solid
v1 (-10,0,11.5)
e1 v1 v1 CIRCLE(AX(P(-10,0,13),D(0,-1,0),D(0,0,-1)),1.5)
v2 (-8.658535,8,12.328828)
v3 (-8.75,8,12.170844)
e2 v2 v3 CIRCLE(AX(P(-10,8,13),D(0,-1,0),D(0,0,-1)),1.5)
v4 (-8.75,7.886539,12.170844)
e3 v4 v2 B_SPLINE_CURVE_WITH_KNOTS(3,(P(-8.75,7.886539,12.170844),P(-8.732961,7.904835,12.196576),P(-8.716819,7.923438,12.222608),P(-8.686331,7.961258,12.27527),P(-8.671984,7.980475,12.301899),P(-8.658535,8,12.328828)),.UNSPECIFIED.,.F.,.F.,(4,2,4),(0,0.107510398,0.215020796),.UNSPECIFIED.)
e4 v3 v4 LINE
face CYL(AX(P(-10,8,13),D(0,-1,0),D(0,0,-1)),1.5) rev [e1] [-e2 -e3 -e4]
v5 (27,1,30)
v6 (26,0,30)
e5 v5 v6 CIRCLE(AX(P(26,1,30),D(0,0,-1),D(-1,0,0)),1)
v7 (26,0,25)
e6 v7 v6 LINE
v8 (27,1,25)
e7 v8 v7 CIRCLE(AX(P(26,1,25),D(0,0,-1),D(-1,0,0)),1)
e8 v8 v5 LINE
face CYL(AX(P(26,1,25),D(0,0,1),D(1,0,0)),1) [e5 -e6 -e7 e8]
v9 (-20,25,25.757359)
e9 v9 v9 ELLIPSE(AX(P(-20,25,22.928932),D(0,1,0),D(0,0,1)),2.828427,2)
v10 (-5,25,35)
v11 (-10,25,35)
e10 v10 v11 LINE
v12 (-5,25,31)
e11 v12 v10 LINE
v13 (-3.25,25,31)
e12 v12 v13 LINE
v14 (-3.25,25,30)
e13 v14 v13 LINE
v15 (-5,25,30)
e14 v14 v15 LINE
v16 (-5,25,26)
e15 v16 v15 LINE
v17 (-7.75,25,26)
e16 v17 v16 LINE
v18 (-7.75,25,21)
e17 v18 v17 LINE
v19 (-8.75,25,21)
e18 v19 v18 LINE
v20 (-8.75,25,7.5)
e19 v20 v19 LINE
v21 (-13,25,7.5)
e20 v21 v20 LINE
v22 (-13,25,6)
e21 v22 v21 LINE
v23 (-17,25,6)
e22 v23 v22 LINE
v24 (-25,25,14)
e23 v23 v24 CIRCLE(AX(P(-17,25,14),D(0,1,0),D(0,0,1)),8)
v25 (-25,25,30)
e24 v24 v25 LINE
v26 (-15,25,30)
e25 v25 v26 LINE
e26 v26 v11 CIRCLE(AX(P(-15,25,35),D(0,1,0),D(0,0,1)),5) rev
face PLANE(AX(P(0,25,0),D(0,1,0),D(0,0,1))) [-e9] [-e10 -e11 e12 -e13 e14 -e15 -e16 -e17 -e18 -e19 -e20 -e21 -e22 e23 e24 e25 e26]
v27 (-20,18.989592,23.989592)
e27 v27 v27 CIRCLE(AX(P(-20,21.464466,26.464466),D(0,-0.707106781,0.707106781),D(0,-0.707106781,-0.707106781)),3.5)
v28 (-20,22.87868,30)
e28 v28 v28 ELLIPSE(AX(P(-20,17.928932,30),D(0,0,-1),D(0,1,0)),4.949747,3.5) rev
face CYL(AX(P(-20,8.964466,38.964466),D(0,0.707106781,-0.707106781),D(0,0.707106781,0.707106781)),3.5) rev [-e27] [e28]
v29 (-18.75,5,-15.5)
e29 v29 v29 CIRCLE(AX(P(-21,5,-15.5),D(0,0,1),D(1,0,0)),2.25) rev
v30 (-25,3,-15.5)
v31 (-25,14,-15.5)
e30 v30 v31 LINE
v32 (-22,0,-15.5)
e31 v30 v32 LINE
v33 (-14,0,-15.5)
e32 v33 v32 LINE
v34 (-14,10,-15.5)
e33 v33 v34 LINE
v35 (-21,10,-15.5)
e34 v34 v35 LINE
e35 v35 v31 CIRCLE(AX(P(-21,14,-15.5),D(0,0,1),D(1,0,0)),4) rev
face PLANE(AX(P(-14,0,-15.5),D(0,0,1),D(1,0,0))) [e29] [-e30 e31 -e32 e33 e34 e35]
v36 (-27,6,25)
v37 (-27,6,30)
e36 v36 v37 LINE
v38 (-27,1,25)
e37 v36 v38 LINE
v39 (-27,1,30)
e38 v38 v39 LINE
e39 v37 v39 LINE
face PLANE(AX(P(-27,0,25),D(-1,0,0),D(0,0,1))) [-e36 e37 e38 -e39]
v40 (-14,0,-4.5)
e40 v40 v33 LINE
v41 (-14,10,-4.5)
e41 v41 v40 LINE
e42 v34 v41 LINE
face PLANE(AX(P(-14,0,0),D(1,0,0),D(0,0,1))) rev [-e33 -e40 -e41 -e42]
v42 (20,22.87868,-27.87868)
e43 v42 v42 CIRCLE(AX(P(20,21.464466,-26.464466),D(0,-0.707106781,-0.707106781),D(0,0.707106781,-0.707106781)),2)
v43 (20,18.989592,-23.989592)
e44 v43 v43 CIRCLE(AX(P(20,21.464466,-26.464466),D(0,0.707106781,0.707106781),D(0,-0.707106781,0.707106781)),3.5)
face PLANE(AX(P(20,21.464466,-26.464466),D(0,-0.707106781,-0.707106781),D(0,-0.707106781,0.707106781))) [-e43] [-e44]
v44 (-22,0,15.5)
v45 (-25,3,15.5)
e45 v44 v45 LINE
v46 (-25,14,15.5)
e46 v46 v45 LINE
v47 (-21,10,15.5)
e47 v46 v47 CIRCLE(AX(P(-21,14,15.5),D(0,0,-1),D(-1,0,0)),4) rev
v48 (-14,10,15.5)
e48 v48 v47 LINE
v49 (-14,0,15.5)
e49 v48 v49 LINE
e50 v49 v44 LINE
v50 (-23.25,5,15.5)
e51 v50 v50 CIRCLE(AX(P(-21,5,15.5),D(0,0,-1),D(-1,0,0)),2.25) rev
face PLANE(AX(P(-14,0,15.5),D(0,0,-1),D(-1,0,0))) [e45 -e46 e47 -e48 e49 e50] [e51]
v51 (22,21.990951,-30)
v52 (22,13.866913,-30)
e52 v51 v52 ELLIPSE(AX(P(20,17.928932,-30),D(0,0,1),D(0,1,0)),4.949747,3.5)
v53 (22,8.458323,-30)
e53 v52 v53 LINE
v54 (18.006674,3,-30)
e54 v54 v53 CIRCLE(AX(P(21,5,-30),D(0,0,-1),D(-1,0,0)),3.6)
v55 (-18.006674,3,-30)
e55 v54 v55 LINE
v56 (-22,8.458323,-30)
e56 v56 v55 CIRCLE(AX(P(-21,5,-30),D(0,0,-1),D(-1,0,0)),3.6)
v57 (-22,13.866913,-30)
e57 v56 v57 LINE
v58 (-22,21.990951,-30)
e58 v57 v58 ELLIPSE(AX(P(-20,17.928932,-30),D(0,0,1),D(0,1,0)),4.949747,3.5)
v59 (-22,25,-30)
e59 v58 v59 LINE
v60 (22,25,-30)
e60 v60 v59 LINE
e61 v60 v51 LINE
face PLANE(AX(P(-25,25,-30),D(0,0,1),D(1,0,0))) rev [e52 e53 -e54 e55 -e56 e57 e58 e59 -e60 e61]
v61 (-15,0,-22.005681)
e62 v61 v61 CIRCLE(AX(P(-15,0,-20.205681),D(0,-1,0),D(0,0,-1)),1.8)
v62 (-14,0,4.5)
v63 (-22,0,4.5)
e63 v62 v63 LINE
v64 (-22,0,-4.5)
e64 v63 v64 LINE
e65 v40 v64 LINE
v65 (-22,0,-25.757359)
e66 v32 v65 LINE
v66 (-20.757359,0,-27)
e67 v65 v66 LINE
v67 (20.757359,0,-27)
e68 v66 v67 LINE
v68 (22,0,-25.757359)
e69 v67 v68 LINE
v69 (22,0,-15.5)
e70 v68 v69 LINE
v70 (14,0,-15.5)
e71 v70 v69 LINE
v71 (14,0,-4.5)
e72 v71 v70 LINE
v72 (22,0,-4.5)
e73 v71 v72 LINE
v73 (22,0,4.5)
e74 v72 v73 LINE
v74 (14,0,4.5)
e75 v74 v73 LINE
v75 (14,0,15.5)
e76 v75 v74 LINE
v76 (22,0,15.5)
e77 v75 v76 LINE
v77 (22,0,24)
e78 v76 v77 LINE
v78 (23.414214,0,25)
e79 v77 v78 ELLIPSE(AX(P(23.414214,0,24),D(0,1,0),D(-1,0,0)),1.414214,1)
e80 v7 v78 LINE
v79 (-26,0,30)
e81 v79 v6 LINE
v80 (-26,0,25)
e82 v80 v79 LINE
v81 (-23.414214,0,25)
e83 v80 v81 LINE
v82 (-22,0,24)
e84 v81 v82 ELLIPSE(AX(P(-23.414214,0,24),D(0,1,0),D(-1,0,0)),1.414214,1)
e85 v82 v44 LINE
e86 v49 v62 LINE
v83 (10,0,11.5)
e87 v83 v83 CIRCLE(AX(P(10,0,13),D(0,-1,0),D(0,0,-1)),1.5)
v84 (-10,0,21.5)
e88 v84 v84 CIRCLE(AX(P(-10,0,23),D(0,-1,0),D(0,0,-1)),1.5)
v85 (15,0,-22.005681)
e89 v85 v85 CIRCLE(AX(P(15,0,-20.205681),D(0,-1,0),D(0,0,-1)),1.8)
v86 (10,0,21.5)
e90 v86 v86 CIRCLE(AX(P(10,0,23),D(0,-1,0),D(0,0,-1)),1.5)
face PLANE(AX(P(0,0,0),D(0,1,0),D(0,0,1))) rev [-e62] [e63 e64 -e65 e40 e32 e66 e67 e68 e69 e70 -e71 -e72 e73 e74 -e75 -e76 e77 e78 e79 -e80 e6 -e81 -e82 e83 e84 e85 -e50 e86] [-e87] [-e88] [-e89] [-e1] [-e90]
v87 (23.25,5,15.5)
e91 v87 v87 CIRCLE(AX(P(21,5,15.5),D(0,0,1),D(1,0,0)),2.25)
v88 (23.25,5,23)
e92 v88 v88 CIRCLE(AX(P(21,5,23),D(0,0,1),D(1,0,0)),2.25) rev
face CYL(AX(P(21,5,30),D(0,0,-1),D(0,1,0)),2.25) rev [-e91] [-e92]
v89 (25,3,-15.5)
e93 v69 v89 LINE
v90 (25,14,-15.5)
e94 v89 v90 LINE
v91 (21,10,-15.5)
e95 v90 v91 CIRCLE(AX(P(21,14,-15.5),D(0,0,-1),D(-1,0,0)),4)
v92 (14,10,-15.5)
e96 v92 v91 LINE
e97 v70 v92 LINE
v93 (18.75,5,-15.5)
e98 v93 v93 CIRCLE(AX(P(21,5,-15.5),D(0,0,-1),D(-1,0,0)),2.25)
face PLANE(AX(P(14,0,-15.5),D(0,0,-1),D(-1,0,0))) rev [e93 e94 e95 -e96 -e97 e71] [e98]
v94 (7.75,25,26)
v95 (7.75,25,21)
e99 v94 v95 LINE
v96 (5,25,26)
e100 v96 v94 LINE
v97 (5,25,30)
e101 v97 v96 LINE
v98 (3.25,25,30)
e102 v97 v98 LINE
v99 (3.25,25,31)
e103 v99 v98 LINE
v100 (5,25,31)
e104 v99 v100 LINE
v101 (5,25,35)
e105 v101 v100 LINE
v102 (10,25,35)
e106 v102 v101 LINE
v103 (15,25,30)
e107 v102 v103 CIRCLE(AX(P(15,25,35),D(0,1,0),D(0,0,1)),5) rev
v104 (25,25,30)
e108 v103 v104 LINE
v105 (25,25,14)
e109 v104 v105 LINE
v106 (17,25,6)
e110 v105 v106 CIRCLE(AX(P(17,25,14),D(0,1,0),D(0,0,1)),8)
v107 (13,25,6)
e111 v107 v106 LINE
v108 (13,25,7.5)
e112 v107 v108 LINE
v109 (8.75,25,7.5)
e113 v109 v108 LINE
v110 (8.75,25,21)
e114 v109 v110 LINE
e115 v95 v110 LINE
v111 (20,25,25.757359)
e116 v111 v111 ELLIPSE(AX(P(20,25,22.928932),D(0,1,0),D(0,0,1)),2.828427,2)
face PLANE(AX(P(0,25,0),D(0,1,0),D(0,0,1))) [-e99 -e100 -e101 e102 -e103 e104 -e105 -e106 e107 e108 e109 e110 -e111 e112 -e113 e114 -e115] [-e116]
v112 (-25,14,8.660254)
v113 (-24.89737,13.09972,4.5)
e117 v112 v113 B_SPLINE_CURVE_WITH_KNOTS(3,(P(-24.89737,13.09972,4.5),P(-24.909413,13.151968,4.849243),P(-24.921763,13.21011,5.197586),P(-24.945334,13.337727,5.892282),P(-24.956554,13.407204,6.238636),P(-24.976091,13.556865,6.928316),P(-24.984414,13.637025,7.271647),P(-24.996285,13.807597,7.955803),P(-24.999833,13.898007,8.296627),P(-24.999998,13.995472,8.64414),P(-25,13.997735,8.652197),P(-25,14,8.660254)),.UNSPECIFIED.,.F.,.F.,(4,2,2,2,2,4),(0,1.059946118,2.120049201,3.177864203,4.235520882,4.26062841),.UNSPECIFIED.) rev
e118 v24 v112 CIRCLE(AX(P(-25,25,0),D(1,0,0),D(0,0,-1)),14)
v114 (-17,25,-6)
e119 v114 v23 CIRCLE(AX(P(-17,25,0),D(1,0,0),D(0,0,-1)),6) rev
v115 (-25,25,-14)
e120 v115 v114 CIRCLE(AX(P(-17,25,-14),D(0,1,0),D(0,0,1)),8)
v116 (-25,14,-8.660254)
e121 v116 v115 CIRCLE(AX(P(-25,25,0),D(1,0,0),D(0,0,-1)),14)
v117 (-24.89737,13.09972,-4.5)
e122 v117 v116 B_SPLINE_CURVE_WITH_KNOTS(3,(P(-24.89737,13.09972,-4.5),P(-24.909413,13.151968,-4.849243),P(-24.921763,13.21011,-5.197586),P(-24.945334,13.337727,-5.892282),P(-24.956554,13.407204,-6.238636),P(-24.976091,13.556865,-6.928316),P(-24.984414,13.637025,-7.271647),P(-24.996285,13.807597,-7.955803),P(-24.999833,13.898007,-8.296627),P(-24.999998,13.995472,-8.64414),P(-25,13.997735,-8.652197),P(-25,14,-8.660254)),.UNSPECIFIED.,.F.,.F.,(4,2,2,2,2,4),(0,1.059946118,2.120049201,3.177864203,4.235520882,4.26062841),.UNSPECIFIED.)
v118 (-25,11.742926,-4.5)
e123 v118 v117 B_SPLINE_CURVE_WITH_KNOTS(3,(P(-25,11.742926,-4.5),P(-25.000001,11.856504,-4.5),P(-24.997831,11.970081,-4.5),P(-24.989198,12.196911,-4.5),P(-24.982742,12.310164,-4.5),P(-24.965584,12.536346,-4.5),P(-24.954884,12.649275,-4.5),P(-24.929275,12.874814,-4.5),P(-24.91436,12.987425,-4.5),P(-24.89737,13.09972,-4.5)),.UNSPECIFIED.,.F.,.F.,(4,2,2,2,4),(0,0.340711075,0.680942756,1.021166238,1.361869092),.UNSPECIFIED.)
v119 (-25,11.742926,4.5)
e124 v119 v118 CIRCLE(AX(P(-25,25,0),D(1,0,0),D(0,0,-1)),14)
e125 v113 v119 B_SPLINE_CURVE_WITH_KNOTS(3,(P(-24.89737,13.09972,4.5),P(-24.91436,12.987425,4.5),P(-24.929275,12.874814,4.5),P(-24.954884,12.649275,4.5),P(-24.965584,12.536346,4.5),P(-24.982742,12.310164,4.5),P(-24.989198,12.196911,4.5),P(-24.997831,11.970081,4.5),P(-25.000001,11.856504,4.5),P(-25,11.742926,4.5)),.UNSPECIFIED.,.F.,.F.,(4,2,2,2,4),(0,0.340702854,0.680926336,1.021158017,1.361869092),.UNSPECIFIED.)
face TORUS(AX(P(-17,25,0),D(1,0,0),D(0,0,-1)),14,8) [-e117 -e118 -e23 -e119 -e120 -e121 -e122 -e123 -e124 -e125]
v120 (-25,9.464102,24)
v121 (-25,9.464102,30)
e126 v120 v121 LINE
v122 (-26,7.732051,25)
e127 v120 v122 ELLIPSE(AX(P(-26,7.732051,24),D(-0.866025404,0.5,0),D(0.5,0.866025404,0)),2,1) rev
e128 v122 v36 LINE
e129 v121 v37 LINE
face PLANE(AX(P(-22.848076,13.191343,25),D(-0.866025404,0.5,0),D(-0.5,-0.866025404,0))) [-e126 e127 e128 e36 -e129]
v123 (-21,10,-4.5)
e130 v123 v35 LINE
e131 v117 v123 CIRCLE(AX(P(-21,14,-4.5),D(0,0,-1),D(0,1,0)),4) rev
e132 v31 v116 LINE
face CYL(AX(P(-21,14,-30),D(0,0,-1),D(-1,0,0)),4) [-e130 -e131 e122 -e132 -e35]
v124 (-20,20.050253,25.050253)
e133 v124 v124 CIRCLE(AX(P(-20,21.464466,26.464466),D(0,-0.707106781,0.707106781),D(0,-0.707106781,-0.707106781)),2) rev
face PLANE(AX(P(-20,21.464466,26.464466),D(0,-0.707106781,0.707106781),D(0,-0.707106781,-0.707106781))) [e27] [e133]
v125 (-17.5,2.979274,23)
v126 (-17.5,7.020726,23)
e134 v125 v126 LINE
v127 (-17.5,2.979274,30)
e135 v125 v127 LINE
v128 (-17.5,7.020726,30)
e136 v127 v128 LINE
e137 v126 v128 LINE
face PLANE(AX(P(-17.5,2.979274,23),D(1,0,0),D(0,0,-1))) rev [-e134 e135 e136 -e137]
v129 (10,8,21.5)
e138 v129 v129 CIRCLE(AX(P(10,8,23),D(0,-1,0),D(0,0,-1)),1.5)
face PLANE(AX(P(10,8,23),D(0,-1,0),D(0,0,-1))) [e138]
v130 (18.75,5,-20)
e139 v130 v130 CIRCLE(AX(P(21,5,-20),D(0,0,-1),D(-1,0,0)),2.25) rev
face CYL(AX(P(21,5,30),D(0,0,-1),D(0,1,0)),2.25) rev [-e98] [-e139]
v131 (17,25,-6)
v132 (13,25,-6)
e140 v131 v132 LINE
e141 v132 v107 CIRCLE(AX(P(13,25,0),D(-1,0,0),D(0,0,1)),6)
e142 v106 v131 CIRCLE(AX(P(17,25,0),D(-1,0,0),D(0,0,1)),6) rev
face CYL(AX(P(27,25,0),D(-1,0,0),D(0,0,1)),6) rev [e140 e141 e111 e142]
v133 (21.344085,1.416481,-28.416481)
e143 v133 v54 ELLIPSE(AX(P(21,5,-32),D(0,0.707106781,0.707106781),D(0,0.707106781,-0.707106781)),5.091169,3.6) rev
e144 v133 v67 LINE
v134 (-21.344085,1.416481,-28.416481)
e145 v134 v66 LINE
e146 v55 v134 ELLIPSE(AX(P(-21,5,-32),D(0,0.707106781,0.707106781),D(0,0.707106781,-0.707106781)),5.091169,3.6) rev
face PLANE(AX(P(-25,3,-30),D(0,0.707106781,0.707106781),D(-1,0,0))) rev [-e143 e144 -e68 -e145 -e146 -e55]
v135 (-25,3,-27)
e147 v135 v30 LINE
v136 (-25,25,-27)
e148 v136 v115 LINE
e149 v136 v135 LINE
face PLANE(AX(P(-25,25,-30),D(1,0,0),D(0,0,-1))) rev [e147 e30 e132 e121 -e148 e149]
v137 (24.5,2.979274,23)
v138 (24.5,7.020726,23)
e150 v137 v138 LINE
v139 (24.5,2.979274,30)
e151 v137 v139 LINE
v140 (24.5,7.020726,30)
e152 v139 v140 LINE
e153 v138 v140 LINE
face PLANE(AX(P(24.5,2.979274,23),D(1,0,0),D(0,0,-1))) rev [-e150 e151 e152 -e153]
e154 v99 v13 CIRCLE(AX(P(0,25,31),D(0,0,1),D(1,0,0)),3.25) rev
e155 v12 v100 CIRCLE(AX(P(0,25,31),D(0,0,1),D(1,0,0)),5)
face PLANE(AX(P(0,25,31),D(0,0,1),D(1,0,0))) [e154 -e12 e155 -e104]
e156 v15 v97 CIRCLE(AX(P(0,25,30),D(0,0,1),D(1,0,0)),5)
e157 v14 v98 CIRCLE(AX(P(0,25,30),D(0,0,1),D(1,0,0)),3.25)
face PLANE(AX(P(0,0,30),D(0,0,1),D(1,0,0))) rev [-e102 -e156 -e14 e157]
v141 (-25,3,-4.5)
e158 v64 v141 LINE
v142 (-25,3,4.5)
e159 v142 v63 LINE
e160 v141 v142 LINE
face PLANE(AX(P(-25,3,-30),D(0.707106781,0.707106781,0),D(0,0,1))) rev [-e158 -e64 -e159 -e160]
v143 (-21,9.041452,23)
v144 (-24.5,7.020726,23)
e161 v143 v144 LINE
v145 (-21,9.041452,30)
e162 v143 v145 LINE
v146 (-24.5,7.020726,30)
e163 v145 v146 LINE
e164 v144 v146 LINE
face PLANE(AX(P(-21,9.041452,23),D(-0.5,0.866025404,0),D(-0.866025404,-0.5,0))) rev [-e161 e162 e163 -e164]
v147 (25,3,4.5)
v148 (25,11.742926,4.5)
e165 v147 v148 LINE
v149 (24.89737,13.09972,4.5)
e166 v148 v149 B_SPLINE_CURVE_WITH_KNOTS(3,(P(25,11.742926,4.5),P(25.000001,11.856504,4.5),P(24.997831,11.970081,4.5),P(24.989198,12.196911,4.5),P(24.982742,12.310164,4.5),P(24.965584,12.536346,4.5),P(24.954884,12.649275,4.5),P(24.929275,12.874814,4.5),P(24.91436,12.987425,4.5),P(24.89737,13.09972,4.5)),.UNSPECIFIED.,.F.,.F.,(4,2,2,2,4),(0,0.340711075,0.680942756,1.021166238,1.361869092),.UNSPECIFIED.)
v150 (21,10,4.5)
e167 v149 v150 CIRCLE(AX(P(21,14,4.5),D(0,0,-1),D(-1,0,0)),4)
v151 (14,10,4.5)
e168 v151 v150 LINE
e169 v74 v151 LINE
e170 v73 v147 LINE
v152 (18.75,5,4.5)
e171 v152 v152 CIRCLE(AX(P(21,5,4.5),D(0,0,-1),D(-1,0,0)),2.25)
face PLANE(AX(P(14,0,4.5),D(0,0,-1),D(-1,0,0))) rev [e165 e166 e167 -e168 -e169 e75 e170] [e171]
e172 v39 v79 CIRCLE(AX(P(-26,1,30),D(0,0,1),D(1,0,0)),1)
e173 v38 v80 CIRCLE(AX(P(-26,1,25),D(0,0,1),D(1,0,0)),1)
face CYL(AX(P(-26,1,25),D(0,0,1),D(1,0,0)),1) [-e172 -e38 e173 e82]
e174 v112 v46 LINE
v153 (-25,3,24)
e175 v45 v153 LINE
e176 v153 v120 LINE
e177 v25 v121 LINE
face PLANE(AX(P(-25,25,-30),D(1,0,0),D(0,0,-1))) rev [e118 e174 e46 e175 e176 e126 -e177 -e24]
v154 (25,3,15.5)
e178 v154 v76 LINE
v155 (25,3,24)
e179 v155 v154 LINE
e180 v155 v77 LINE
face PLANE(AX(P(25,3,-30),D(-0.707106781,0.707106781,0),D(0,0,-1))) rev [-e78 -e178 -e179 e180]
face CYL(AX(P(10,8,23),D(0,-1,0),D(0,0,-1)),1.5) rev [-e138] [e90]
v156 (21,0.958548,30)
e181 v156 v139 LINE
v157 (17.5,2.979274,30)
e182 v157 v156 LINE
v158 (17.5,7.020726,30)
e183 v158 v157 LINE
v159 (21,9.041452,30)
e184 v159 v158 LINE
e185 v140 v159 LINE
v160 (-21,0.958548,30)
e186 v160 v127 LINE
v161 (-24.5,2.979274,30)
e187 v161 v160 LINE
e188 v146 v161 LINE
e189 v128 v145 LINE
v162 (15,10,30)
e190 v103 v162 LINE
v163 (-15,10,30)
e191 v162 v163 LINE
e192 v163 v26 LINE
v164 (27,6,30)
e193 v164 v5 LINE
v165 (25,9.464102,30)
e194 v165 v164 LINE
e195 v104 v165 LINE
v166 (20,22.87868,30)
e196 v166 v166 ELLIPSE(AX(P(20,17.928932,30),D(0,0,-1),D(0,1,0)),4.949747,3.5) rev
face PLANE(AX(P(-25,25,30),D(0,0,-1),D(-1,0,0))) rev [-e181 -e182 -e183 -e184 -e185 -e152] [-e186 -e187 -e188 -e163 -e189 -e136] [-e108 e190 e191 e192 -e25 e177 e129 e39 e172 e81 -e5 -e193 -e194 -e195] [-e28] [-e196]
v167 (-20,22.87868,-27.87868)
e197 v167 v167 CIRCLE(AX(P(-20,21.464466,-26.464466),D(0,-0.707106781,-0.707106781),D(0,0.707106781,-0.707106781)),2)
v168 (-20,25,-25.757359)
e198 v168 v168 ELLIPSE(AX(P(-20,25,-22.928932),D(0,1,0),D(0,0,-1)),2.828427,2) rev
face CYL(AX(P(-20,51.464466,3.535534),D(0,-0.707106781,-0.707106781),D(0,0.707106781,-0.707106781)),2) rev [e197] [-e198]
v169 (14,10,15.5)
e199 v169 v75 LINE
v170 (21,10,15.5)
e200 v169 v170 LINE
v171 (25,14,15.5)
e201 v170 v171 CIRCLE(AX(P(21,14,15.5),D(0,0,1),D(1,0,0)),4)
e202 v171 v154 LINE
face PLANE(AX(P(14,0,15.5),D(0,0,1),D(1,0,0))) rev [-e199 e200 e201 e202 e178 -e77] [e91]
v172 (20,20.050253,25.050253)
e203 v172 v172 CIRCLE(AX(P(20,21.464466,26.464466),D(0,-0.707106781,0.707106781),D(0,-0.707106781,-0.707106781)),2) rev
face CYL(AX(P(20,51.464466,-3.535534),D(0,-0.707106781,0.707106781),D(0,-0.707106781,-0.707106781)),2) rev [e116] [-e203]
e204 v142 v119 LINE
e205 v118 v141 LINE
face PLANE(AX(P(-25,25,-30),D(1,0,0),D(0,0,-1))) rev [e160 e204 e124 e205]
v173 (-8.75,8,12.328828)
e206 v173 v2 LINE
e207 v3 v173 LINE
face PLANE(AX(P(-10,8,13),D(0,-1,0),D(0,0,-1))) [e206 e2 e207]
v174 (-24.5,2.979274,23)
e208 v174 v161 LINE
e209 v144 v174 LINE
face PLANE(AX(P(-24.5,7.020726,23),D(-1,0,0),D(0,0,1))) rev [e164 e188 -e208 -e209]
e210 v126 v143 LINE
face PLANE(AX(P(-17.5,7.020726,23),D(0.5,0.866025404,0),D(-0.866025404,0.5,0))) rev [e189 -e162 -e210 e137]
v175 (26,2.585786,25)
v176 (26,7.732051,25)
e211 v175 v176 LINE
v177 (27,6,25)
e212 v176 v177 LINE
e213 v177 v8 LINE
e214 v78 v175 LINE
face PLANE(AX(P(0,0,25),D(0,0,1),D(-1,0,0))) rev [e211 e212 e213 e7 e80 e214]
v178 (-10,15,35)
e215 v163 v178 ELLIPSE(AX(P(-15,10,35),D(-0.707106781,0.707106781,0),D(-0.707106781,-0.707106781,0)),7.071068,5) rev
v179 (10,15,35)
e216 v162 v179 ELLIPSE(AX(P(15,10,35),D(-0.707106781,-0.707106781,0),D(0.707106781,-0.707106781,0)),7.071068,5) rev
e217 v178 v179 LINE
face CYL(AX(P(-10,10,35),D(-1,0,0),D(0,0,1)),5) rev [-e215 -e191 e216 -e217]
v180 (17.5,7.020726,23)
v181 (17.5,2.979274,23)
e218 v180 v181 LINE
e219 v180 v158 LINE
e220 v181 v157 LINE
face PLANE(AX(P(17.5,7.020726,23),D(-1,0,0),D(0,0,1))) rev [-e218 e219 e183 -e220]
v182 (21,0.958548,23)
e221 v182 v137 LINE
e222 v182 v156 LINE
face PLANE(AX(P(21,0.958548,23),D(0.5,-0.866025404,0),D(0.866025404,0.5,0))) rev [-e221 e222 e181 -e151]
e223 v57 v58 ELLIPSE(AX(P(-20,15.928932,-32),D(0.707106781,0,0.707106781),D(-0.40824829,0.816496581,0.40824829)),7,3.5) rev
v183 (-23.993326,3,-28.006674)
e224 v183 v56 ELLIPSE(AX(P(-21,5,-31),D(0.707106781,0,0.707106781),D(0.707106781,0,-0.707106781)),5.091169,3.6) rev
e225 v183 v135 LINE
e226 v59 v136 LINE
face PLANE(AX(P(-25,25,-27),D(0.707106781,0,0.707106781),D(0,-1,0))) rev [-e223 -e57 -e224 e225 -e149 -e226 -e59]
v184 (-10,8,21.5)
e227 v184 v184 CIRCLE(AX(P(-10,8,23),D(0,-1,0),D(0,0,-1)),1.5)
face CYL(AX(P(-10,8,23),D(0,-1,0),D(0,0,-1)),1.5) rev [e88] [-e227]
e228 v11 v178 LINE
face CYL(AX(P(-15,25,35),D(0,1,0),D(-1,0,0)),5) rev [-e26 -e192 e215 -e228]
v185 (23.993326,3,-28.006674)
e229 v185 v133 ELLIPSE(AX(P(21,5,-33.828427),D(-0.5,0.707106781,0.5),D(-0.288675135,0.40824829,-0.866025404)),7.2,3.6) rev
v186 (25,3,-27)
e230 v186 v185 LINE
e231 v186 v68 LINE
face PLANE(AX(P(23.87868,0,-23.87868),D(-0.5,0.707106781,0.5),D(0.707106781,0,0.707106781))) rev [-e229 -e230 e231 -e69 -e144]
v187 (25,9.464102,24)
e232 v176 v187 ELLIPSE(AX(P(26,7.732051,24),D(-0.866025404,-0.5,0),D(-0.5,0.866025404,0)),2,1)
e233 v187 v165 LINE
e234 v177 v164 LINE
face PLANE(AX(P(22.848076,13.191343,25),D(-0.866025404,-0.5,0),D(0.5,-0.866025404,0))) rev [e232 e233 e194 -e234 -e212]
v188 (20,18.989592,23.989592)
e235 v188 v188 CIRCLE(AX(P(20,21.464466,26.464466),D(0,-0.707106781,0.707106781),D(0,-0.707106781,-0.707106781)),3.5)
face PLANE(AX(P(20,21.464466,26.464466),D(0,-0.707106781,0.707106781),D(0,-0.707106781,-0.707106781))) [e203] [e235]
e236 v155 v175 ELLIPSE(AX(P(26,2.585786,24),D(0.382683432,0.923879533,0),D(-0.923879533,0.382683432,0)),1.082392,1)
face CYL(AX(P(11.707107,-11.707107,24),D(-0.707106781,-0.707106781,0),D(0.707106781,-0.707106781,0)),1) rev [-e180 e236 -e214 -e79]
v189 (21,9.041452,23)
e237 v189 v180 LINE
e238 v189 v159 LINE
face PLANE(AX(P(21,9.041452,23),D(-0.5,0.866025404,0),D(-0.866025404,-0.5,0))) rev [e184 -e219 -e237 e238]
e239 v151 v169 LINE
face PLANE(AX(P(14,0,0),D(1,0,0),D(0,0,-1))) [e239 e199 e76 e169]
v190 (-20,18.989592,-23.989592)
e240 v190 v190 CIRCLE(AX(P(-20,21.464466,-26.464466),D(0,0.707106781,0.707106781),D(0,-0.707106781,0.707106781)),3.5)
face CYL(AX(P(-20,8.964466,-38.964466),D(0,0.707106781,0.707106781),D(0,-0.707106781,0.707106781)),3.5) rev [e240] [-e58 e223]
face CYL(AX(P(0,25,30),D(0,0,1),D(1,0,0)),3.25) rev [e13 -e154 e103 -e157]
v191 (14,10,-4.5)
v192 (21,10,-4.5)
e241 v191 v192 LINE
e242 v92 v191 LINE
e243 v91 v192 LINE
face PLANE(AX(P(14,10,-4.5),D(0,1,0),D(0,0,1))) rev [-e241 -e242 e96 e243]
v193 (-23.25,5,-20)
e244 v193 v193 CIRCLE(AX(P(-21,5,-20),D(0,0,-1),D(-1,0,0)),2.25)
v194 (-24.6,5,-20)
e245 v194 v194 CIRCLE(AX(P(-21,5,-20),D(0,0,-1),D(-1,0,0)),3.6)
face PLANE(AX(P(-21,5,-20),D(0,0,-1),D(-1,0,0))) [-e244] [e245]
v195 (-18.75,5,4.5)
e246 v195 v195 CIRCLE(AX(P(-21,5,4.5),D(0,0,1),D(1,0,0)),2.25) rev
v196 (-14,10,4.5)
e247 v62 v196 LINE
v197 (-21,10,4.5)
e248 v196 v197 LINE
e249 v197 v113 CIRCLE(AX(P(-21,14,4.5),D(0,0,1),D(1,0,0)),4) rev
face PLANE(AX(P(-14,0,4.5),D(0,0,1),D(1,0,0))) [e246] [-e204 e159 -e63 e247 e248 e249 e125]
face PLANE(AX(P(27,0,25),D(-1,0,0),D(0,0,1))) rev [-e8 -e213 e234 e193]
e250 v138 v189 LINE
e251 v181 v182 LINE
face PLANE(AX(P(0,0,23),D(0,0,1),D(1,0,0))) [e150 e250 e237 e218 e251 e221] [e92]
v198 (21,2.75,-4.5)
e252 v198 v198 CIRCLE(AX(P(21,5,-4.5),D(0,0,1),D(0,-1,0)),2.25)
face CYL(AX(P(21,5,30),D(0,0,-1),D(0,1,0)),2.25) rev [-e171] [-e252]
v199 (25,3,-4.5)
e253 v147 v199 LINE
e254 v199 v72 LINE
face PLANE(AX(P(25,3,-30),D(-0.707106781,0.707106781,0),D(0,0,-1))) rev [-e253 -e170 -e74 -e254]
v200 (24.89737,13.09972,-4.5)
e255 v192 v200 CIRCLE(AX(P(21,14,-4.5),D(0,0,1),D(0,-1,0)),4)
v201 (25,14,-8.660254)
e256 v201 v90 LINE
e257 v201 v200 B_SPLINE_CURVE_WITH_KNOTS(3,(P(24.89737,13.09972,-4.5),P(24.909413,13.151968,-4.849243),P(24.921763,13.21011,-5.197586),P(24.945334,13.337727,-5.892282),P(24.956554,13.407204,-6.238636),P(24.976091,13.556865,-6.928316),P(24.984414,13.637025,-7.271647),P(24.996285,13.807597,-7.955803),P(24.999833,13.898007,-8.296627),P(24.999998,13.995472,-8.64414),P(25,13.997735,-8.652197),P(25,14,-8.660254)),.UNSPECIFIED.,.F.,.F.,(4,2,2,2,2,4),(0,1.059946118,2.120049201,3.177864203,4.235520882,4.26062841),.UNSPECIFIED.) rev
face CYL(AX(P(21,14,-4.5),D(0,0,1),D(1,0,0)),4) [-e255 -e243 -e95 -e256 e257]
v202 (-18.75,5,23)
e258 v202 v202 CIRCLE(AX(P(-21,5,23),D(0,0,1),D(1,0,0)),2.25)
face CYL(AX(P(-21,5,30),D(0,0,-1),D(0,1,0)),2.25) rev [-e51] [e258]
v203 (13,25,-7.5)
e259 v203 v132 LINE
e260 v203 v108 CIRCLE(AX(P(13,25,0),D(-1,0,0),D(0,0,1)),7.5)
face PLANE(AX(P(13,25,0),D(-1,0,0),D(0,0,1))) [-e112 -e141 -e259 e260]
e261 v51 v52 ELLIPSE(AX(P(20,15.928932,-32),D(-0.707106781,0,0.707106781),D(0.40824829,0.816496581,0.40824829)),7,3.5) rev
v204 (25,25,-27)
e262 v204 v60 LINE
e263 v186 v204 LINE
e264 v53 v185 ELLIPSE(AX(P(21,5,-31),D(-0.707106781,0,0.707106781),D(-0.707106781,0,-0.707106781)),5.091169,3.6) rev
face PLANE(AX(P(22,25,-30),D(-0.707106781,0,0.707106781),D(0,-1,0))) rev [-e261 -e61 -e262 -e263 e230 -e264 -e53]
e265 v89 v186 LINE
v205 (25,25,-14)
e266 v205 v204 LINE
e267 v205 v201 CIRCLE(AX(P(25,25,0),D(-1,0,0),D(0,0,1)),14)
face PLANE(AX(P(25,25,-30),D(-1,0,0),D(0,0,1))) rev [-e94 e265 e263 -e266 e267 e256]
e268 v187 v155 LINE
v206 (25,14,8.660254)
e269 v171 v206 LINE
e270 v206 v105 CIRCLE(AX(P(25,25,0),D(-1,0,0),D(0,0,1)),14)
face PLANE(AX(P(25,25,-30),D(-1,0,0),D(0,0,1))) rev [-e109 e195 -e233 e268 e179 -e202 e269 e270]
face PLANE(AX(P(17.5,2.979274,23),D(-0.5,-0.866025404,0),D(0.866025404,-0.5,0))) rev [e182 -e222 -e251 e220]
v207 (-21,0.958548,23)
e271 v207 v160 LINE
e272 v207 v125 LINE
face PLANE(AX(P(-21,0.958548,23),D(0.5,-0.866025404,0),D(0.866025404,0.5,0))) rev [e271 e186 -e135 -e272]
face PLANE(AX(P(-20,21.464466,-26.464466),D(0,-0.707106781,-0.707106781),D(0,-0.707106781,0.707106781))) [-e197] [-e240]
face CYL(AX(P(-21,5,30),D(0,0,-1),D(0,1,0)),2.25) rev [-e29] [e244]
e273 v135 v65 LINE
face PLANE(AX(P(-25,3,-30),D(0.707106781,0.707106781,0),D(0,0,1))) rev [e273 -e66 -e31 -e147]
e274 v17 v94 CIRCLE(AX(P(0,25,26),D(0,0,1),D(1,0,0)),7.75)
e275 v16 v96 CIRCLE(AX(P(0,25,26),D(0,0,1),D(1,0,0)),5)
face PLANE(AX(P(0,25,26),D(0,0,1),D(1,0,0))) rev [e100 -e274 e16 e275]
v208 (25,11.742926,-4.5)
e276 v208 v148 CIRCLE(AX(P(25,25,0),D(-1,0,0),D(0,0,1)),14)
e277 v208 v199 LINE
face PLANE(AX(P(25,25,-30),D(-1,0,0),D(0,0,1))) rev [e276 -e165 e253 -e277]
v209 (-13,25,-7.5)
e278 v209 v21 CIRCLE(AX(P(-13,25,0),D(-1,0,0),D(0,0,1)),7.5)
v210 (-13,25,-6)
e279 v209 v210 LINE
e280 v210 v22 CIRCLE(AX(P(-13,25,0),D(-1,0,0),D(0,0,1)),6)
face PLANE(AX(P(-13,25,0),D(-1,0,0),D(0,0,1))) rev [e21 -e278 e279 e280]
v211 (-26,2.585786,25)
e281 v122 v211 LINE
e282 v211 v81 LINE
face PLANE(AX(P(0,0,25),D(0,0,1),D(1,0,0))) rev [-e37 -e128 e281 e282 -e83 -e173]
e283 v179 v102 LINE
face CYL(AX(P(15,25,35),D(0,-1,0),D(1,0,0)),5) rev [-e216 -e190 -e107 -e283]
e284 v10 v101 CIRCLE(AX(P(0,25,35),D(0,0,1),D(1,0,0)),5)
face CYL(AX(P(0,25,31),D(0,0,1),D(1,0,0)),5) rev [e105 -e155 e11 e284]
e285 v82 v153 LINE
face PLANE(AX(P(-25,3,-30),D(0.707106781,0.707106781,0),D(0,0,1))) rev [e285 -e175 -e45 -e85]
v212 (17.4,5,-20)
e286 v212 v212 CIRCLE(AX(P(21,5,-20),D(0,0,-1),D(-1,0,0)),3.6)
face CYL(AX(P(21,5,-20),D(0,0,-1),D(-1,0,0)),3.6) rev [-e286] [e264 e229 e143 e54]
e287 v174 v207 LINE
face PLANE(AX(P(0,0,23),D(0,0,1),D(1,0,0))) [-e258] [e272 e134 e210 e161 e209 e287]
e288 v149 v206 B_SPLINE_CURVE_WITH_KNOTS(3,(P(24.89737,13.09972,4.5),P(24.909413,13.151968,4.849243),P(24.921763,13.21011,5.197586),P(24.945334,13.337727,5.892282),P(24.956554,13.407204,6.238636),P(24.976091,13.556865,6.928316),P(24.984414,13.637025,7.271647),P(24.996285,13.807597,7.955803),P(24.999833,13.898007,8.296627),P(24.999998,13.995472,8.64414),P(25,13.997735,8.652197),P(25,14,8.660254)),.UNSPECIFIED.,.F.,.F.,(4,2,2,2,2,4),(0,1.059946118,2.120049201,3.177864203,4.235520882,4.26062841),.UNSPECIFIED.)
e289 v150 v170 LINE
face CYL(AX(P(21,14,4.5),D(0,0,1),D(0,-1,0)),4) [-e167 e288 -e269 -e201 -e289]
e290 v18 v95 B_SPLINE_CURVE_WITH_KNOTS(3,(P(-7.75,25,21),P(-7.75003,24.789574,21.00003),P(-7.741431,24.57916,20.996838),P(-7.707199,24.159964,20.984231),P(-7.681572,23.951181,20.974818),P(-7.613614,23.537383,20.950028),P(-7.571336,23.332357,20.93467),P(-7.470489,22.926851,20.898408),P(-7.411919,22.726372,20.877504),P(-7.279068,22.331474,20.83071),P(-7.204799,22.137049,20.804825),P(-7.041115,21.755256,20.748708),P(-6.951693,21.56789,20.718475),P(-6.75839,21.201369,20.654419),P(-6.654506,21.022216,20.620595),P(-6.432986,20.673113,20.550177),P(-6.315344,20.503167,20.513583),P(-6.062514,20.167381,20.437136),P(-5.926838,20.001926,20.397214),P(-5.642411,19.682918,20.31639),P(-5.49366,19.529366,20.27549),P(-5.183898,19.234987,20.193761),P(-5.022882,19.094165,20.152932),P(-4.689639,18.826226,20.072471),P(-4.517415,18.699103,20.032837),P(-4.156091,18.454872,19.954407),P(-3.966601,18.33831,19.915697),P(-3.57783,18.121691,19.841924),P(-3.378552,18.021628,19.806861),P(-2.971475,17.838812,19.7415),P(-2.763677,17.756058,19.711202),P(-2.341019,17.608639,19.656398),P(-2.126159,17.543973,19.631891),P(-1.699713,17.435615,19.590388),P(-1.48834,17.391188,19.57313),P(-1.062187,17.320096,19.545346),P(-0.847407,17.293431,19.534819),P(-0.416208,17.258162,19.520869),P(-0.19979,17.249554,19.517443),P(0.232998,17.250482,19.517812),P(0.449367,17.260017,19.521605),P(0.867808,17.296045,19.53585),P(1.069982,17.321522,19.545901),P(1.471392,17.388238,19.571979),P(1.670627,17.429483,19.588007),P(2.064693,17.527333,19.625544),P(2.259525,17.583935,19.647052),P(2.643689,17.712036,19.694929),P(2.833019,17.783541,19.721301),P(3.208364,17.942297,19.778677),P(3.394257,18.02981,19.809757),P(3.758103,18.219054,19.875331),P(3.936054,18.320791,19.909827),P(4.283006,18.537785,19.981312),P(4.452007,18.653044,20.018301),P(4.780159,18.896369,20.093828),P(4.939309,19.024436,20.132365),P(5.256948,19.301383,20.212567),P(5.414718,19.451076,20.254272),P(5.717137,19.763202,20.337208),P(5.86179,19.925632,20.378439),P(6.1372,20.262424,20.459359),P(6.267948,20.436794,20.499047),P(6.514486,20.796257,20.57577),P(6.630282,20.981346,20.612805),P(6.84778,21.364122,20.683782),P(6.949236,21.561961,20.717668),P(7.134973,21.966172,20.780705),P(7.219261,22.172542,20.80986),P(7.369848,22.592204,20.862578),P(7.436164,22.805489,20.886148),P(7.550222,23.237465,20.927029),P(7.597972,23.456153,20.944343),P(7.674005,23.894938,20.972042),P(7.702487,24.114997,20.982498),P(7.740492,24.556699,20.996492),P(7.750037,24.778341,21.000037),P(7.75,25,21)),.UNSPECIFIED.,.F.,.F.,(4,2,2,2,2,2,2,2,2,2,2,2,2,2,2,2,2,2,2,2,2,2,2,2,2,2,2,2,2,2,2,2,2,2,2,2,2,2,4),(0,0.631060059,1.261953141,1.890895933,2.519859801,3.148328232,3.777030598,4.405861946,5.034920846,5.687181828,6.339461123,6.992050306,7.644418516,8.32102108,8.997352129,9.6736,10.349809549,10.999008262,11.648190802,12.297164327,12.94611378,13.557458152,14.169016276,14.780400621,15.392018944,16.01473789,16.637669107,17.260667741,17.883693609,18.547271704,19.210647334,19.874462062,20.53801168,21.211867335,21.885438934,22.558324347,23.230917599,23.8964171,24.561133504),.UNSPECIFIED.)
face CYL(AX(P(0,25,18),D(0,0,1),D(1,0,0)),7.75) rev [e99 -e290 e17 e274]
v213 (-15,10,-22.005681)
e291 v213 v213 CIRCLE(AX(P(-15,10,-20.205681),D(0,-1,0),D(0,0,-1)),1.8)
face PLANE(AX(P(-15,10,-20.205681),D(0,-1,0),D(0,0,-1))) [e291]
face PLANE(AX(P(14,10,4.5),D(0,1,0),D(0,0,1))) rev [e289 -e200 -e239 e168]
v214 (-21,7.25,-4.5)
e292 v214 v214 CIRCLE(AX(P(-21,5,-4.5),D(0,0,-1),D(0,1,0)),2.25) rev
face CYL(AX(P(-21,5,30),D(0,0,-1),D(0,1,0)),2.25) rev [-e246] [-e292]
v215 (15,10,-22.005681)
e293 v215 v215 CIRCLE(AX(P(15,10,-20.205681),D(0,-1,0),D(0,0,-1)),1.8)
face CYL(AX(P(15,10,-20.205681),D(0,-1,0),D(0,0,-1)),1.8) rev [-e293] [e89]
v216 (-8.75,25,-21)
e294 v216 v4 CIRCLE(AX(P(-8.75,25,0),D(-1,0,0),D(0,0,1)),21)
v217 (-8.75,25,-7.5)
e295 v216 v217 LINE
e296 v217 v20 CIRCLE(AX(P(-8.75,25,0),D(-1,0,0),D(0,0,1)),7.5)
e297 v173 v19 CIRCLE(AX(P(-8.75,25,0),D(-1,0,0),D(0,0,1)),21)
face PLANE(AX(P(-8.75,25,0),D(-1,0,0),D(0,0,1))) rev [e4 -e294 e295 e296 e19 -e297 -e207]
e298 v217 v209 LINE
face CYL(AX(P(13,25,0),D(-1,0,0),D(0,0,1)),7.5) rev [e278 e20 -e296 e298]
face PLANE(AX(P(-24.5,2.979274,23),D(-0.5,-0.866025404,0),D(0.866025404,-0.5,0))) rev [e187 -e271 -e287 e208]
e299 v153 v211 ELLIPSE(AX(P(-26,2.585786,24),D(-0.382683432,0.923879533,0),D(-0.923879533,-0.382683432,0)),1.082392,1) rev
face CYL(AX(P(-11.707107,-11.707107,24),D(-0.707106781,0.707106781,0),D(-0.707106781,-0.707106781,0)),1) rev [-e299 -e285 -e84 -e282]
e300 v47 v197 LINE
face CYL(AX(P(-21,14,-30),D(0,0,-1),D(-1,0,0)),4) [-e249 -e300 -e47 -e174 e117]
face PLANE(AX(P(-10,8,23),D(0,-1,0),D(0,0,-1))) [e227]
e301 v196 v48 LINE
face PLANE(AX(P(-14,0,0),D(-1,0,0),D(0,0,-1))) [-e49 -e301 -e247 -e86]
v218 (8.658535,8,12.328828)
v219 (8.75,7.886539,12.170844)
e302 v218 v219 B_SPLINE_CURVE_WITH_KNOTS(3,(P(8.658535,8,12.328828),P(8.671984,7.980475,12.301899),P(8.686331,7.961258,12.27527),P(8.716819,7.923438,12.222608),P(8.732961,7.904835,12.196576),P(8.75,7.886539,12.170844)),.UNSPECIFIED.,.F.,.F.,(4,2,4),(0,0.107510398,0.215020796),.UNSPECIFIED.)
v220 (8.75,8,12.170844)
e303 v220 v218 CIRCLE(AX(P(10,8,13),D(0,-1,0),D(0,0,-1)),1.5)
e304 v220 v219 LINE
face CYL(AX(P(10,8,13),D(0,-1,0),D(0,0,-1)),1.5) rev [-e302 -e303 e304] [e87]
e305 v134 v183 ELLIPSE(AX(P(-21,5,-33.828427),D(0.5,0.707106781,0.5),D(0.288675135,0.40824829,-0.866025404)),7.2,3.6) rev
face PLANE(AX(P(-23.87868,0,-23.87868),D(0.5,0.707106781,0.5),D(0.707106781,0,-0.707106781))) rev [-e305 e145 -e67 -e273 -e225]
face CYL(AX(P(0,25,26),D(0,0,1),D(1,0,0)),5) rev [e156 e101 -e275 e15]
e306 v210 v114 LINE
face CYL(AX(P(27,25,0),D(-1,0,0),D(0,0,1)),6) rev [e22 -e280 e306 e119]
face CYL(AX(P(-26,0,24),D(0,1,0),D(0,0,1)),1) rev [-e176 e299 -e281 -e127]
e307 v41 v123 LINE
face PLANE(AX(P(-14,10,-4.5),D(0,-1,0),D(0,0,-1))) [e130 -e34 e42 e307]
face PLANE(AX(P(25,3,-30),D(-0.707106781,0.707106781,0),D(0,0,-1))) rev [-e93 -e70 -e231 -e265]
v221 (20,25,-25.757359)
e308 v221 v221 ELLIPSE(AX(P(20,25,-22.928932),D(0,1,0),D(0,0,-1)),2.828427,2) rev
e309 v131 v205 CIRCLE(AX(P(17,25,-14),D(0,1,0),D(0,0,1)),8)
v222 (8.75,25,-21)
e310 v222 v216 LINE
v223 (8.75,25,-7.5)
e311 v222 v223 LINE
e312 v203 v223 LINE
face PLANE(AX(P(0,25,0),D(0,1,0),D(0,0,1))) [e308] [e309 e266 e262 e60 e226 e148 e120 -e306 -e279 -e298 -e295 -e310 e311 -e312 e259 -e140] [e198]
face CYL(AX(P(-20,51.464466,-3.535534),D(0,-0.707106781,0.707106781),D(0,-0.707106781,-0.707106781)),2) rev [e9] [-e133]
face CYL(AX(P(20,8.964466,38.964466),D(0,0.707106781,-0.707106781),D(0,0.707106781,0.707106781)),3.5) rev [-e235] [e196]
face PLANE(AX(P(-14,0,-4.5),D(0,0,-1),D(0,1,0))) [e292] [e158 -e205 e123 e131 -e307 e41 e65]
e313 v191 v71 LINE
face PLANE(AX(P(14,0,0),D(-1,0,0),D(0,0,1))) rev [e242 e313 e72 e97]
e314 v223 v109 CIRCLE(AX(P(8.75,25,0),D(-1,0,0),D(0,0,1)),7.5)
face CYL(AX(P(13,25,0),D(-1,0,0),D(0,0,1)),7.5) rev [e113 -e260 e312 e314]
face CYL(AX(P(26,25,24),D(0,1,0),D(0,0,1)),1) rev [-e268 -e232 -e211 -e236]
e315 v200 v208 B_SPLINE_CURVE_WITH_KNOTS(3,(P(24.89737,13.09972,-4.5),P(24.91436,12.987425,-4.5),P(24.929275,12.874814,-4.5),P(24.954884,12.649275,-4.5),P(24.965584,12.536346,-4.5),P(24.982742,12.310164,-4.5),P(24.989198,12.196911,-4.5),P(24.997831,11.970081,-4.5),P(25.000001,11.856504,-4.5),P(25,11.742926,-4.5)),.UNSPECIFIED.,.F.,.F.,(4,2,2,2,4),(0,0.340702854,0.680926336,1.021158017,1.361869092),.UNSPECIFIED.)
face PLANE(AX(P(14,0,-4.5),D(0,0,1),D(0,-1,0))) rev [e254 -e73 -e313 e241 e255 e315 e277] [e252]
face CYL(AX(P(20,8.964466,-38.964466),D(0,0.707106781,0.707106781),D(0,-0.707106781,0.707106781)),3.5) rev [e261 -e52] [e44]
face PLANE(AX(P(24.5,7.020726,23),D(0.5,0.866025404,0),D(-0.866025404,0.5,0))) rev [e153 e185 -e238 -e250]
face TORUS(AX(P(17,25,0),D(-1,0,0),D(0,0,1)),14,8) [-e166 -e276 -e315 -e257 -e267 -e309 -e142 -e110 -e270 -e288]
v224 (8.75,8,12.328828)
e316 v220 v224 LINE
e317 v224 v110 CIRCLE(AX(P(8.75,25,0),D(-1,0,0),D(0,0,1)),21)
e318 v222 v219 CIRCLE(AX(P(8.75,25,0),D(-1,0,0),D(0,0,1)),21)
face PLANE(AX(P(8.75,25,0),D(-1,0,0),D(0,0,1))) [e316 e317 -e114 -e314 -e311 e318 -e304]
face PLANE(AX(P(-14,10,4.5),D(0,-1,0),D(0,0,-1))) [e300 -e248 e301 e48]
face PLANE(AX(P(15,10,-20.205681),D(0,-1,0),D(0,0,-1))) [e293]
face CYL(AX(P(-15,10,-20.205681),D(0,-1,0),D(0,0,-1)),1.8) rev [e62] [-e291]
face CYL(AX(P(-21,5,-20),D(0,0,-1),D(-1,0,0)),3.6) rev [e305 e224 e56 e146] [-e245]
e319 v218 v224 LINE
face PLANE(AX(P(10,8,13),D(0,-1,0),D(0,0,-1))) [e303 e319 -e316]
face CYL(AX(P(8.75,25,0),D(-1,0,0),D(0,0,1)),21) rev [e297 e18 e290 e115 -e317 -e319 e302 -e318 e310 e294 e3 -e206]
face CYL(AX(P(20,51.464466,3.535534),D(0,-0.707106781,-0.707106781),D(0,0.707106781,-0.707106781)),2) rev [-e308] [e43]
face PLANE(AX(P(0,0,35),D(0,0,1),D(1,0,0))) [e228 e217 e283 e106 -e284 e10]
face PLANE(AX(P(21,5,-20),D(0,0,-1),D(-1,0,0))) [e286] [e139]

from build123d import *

# Parameters (mm, degrees)
SKETCH1_W                = 50
SKETCH1_H                = 60
BOSS_EXTRUDE1_DEPTH      = 25
CUT_EXTRUDE1_START       = -16.25
SKETCH2_R                = 21
CUT_EXTRUDE1_DEPTH       = 17.5
CUT_EXTRUDE2_START       = -12
SKETCH3_R                = 7.5
CUT_EXTRUDE2_DEPTH       = 26
SKETCH4_R                = 5
CUT_EXTRUDE3_DEPTH       = 4
SKETCH10_W               = 11
SKETCH10_H               = 10
CUT_EXTRUDE9_DEPTH       = 11
SKETCH11_R               = 2.25
CUT_EXTRUDE10_DEPTH      = 50.398886627
SKETCH12_R               = 2
CUT_EXTRUDE11_DEPTH      = 50.371044145
SKETCH13_R               = 3.5
CUT_EXTRUDE12_DEPTH      = 50.371044145
CHAMFER1_SIZE            = 3
FILLET1_R                = 4
SKETCH14_R               = 1.8
CUT_EXTRUDE13_DEPTH      = 10
CUT_EXTRUDE14_DEPTH      = 7
BOSS_EXTRUDE2_DEPTH      = 5
CHAMFER2_SIZE            = 3
FILLET2_R                = 1
CUT_EXTRUDE15_DEPTH      = 66.030761952
CUT_EXTRUDE15_DEPTH_BACK = 66.030761952
SKETCH17_R               = 6
SKETCH21_R               = 7.75
CUT_EXTRUDE16_DEPTH      = 8
SKETCH22_W               = 20
SKETCH22_H               = 10
BOSS_EXTRUDE3_DEPTH      = 5
SKETCH23_R               = 3.25
CUT_EXTRUDE17_DEPTH      = 5
SKETCH24_R               = 5
CUT_EXTRUDE18_DEPTH      = 4
FILLET4_R                = 5
SKETCH25_R               = 1.5
CUT_EXTRUDE19_DEPTH      = 8
SKETCH26_R               = 3.6
CUT_EXTRUDE20_DEPTH      = 10


with BuildPart() as part:
    # Sketch1 → Boss-Extrude1 (new body)
    with BuildSketch(Plane(origin=(0, 0, 0), x_dir=(1, 0, 0), z_dir=(0, 1, 0))):
        Rectangle(SKETCH1_W, SKETCH1_H)
    extrude(amount=BOSS_EXTRUDE1_DEPTH)

    # Sketch2 → Cut-Extrude1 (cut)
    with BuildSketch(Plane.ZY.offset(25).offset(CUT_EXTRUDE1_START)):
        with Locations((0, 25)):
            Circle(SKETCH2_R)
    extrude(amount=-CUT_EXTRUDE1_DEPTH, mode=Mode.SUBTRACT)

    # Sketch3 → Cut-Extrude2 (cut)
    with BuildSketch(Plane.ZY.offset(25).offset(CUT_EXTRUDE2_START)):
        with Locations((0, 25)):
            Circle(SKETCH3_R)
    extrude(amount=-CUT_EXTRUDE2_DEPTH, mode=Mode.SUBTRACT)

    # Sketch4 → Cut-Extrude3 (cut)
    with BuildSketch(Plane.XY.offset(30)):
        with Locations((0, 25)):
            Circle(SKETCH4_R)
    extrude(amount=-CUT_EXTRUDE3_DEPTH, mode=Mode.SUBTRACT)

    # Sketch10 → Cut-Extrude9 (cut)
    with BuildSketch(Plane(origin=(25, 0, 0), x_dir=(0, 0, -1), z_dir=(1, 0, 0))):
        with Locations((-10, 5)):
            Rectangle(SKETCH10_W, SKETCH10_H)
        with Locations((10, 5)):
            Rectangle(SKETCH10_W, SKETCH10_H)
    cut_extrude9 = extrude(amount=-CUT_EXTRUDE9_DEPTH, mode=Mode.SUBTRACT)

    # Sketch11 → Cut-Extrude10 (cut, symmetric)
    with BuildSketch(Plane(origin=(0, 0, -4.5), x_dir=(-1, 0, 0), z_dir=(0, 0, -1))):
        with Locations(Location((-21, 5, 0), (0, 0, 90))):
            Circle(SKETCH11_R)
    cut_extrude10 = extrude(amount=CUT_EXTRUDE10_DEPTH, both=True, mode=Mode.SUBTRACT)

    # Mirror1: Cut-Extrude9, Cut-Extrude10 across plane
    add(cut_extrude9.mirror(Plane(origin=(0, 0, 0), x_dir=(0, 0, 1), z_dir=(1, 0, 0))), mode=Mode.SUBTRACT)
    add(cut_extrude10.mirror(Plane(origin=(0, 0, 0), x_dir=(0, 0, 1), z_dir=(1, 0, 0))), mode=Mode.SUBTRACT)

    # Sketch12 → Cut-Extrude11 (cut, symmetric)
    with BuildSketch(Plane(origin=(0, -2.5, 2.5), x_dir=(1, 0, 0), z_dir=(0, -0.7071067811865475, 0.7071067811865477))):
        with Locations(Location((20, 33.890872965, 0), (0, 0, 270))):
            Circle(SKETCH12_R)
        with Locations(Location((-20, 33.890872965, 0), (0, 0, 270))):
            Circle(SKETCH12_R)
    cut_extrude11 = extrude(amount=CUT_EXTRUDE11_DEPTH, both=True, mode=Mode.SUBTRACT)

    # Sketch13 → Cut-Extrude12 (cut, through all)
    with BuildSketch(Plane(origin=(0, -2.5, 2.5), x_dir=(1, 0, 0), z_dir=(0, -0.7071067811865475, 0.7071067811865477))):
        with Locations(Location((-20, 33.890872965, 0), (0, 0, 90))):
            Circle(SKETCH13_R)
        with Locations(Location((20, 33.890872965, 0), (0, 0, 90))):
            Circle(SKETCH13_R)
    cut_extrude12 = extrude(amount=CUT_EXTRUDE12_DEPTH, mode=Mode.SUBTRACT)

    # Mirror3: Cut-Extrude11, Cut-Extrude12 across plane
    add(cut_extrude11.mirror(Plane.XY), mode=Mode.SUBTRACT)
    add(cut_extrude12.mirror(Plane.XY), mode=Mode.SUBTRACT)

    # Chamfer1
    # the kernel refuses this chamfer: 3 mm, written as the material it takes off along each edge
    with BuildSketch(Plane(origin=(25, -7.715048964, -30), x_dir=(-1, 0, 0), z_dir=(0, 1, 0))) as chamfer1_piece_1:
        Polygon((CHAMFER1_SIZE, 0), (0, CHAMFER1_SIZE), (0, 0), align=None)
    extrude(amount=40.430097928, mode=Mode.SUBTRACT)
    with BuildSketch(Plane(origin=(-25, -7.715048964, -30), x_dir=(1, 0, 0), z_dir=(0, 1, 0))) as chamfer1_piece_2:
        Polygon((CHAMFER1_SIZE, 0), (0, -CHAMFER1_SIZE), (0, 0), align=None)
    extrude(amount=40.430097928, mode=Mode.SUBTRACT)

    # Fillet1
    fillet1_edges = [part.edges().sort_by_distance(p)[0] for p in [
        (-25, 10, -10),
        (25, 10, 10),
        (25, 10, -10),
        (-25, 10, 10),
    ]]
    fillet(fillet1_edges, radius=FILLET1_R)

    # Sketch14 → Cut-Extrude13 (cut)
    with BuildSketch(Plane.XZ):
        with Locations(Location((-15, -20.205680561, 0), (0, 0, 270))):
            Circle(SKETCH14_R)
        with Locations(Location((15, -20.205680561, 0), (0, 0, 270))):
            Circle(SKETCH14_R)
    extrude(amount=-CUT_EXTRUDE13_DEPTH, mode=Mode.SUBTRACT)

    # Sketch15 → Cut-Extrude14 (cut)
    with BuildSketch(Plane.XY.offset(30)):
        Polygon((-21, 0.958548116), (-17.5, 2.979274058), (-17.5, 7.020725942), (-21, 9.041451884), (-24.5, 7.020725942), (-24.5, 2.979274058), align=None)
        Polygon((21, 0.958548116), (24.5, 2.979274058), (24.5, 7.020725942), (21, 9.041451884), (17.5, 7.020725942), (17.5, 2.979274058), align=None)
    extrude(amount=-CUT_EXTRUDE14_DEPTH, mode=Mode.SUBTRACT)

    # Sketch16 → Boss-Extrude2 (add)
    with BuildSketch(Plane.XY.offset(30)):
        with BuildLine():
            Line((-25, 0), (-25, 9.464101615))
            Line((-25, 9.464101615), (-27, 6))
            Line((-27, 6), (-27, 1))
            ThreePointArc((-27, 1), (-26.707106781, 0.292893219), (-26, 0))
            Line((-26, 0), (-25, 0))
        make_face()
    boss_extrude2 = extrude(amount=-BOSS_EXTRUDE2_DEPTH)

    # Mirror4: Boss-Extrude2 across plane
    add(boss_extrude2.mirror(Plane(origin=(0, 0, 0), x_dir=(0, 0, 1), z_dir=(1, 0, 0))))

    # Chamfer2
    # the kernel refuses this chamfer: 3 mm, written as the material it takes off along each edge
    with BuildSketch(Plane(origin=(-25, 0, 25), x_dir=(0, 1, 0), z_dir=(0, 0, -1))) as chamfer2_piece_1:
        Polygon((CHAMFER2_SIZE, 0), (0, CHAMFER2_SIZE), (0, 0), align=None)
    extrude(amount=17.215048964, mode=Mode.SUBTRACT)
    with BuildSketch(Plane(origin=(-25, 0, 12.215048964), x_dir=(0, 1, 0), z_dir=(0, 0, -1))) as chamfer2_piece_2:
        Polygon((CHAMFER2_SIZE, 0), (0, CHAMFER2_SIZE), (0, 0), align=None)
    extrude(amount=24.430097928, mode=Mode.SUBTRACT)
    with BuildSketch(Plane(origin=(-25, 0, -7.784951036), x_dir=(0, 1, 0), z_dir=(0, 0, -1))) as chamfer2_piece_3:
        Polygon((CHAMFER2_SIZE, 0), (0, CHAMFER2_SIZE), (0, 0), align=None)
    extrude(amount=26.930097928, mode=Mode.SUBTRACT)
    with BuildSketch(Plane(origin=(-16.54463656, 0, -35.45536344), x_dir=(0, 1, 0), z_dir=(-0.7071067811865476, 0, 0.7071067811865476))) as chamfer2_piece_4:
        Polygon((CHAMFER2_SIZE, 0), (0, -CHAMFER2_SIZE), (0, 0), align=None)
    extrude(amount=19.672738615, mode=Mode.SUBTRACT)
    with BuildSketch(Plane(origin=(-29.715048964, 0, -30), x_dir=(0, 1, 0), z_dir=(1, 0, 0))) as chamfer2_piece_5:
        Polygon((CHAMFER2_SIZE, 0), (0, CHAMFER2_SIZE), (0, 0), align=None)
    extrude(amount=59.430097928, mode=Mode.SUBTRACT)
    with BuildSketch(Plane(origin=(16.54463656, 0, -35.45536344), x_dir=(0, 1, 0), z_dir=(0.7071067811865476, 0, 0.7071067811865476))) as chamfer2_piece_6:
        Polygon((CHAMFER2_SIZE, 0), (0, CHAMFER2_SIZE), (0, 0), align=None)
    extrude(amount=19.672738615, mode=Mode.SUBTRACT)
    with BuildSketch(Plane(origin=(25, 0, -34.715048964), x_dir=(-1, 0, 0), z_dir=(0, 0, 1))) as chamfer2_piece_7:
        Polygon((CHAMFER2_SIZE, 0), (0, -CHAMFER2_SIZE), (0, 0), align=None)
    extrude(amount=26.930097928, mode=Mode.SUBTRACT)
    with BuildSketch(Plane(origin=(25, 0, 7.784951036), x_dir=(-1, 0, 0), z_dir=(0, 0, 1))) as chamfer2_piece_8:
        Polygon((CHAMFER2_SIZE, 0), (0, -CHAMFER2_SIZE), (0, 0), align=None)
    extrude(amount=17.215048964, mode=Mode.SUBTRACT)
    with BuildSketch(Plane(origin=(25, 0, -12.215048964), x_dir=(-1, 0, 0), z_dir=(0, 0, 1))) as chamfer2_piece_9:
        Polygon((CHAMFER2_SIZE, 0), (0, -CHAMFER2_SIZE), (0, 0), align=None)
    extrude(amount=24.430097928, mode=Mode.SUBTRACT)

    # Fillet2
    fillet2_edges = [part.edges().sort_by_distance(p)[0] for p in [
        (-25, 6.232050808, 25),
        (25, 6.232050808, 25),
        (-23.5, 1.5, 25),
        (23.5, 1.5, 25),
    ]]
    fillet(fillet2_edges, radius=FILLET2_R)

    # Sketch17 → Cut-Extrude15 (cut, two sides: drawn at the far end of the back side and taken through both)
    with BuildSketch(Plane.ZY.offset(25).offset(-CUT_EXTRUDE15_DEPTH_BACK)):
        with Locations((0, 25)):
            Circle(SKETCH17_R)
    extrude(amount=CUT_EXTRUDE15_DEPTH + CUT_EXTRUDE15_DEPTH_BACK, mode=Mode.SUBTRACT)

    # Fillet3: read off the stored shape, not the designer's step
    # Fillet3 outline → Fillet3 (revolve, cut)
    with BuildSketch(Plane(origin=(0, 25, 0), x_dir=(0, 1, 0), z_dir=(0, 0, -1))):
        with BuildLine():
            Line((6, 25), (6, 17))
            ThreePointArc((6, 17), (8.343145751, 22.656854249), (14, 25))
            Line((14, 25), (6, 25))
        make_face()
        with BuildLine():
            ThreePointArc((14, -25), (8.343145751, -22.656854249), (6, -17))
            Line((6, -17), (6, -25))
            Line((6, -25), (14, -25))
        make_face()
    revolve(axis=Axis((0, 25, 0), (1, 0, 0)), mode=Mode.SUBTRACT)

    # Sketch21 → Cut-Extrude16 (cut)
    with BuildSketch(Plane.XY.offset(26)):
        with Locations((0, 25)):
            Circle(SKETCH21_R)
    extrude(amount=-CUT_EXTRUDE16_DEPTH, mode=Mode.SUBTRACT)

    # Sketch22 → Boss-Extrude3 (add)
    with BuildSketch(Plane.XY.offset(30)):
        with Locations((0, 20)):
            Rectangle(SKETCH22_W, SKETCH22_H)
    extrude(amount=BOSS_EXTRUDE3_DEPTH)

    # Sketch23 → Cut-Extrude17 (cut)
    with BuildSketch(Plane.XY.offset(35)):
        with Locations((0, 25)):
            Circle(SKETCH23_R)
    extrude(amount=-CUT_EXTRUDE17_DEPTH, mode=Mode.SUBTRACT)

    # Sketch24 → Cut-Extrude18 (cut)
    with BuildSketch(Plane.XY.offset(35)):
        with Locations((0, 25)):
            Circle(SKETCH24_R)
    extrude(amount=-CUT_EXTRUDE18_DEPTH, mode=Mode.SUBTRACT)

    # Fillet4
    fillet4_edges = [part.edges().sort_by_distance(p)[0] for p in [
        (-10, 20, 30),
        (0, 15, 30),
        (10, 20, 30),
    ]]
    fillet(fillet4_edges, radius=FILLET4_R - 0.0001)  # a hair under: the kernel refuses the full size

    # Sketch25 → Cut-Extrude19 (cut)
    with BuildSketch(Plane.XZ):
        with Locations(Location((10, 23, 0), (0, 0, 270))):
            Circle(SKETCH25_R)
        with Locations(Location((-10, 23, 0), (0, 0, 270))):
            Circle(SKETCH25_R)
        with Locations(Location((10, 13, 0), (0, 0, 270))):
            Circle(SKETCH25_R)
        with Locations(Location((-10, 13, 0), (0, 0, 270))):
            Circle(SKETCH25_R)
    extrude(amount=-CUT_EXTRUDE19_DEPTH, mode=Mode.SUBTRACT)

    # Sketch26 → Cut-Extrude20 (cut)
    with BuildSketch(Plane(origin=(0, 0, -30), x_dir=(-1, 0, 0), z_dir=(0, 0, -1))):
        with Locations((21, 5)):
            Circle(SKETCH26_R)
        with Locations((-21, 5)):
            Circle(SKETCH26_R)
    extrude(amount=-CUT_EXTRUDE20_DEPTH, mode=Mode.SUBTRACT)


solid = part.part
